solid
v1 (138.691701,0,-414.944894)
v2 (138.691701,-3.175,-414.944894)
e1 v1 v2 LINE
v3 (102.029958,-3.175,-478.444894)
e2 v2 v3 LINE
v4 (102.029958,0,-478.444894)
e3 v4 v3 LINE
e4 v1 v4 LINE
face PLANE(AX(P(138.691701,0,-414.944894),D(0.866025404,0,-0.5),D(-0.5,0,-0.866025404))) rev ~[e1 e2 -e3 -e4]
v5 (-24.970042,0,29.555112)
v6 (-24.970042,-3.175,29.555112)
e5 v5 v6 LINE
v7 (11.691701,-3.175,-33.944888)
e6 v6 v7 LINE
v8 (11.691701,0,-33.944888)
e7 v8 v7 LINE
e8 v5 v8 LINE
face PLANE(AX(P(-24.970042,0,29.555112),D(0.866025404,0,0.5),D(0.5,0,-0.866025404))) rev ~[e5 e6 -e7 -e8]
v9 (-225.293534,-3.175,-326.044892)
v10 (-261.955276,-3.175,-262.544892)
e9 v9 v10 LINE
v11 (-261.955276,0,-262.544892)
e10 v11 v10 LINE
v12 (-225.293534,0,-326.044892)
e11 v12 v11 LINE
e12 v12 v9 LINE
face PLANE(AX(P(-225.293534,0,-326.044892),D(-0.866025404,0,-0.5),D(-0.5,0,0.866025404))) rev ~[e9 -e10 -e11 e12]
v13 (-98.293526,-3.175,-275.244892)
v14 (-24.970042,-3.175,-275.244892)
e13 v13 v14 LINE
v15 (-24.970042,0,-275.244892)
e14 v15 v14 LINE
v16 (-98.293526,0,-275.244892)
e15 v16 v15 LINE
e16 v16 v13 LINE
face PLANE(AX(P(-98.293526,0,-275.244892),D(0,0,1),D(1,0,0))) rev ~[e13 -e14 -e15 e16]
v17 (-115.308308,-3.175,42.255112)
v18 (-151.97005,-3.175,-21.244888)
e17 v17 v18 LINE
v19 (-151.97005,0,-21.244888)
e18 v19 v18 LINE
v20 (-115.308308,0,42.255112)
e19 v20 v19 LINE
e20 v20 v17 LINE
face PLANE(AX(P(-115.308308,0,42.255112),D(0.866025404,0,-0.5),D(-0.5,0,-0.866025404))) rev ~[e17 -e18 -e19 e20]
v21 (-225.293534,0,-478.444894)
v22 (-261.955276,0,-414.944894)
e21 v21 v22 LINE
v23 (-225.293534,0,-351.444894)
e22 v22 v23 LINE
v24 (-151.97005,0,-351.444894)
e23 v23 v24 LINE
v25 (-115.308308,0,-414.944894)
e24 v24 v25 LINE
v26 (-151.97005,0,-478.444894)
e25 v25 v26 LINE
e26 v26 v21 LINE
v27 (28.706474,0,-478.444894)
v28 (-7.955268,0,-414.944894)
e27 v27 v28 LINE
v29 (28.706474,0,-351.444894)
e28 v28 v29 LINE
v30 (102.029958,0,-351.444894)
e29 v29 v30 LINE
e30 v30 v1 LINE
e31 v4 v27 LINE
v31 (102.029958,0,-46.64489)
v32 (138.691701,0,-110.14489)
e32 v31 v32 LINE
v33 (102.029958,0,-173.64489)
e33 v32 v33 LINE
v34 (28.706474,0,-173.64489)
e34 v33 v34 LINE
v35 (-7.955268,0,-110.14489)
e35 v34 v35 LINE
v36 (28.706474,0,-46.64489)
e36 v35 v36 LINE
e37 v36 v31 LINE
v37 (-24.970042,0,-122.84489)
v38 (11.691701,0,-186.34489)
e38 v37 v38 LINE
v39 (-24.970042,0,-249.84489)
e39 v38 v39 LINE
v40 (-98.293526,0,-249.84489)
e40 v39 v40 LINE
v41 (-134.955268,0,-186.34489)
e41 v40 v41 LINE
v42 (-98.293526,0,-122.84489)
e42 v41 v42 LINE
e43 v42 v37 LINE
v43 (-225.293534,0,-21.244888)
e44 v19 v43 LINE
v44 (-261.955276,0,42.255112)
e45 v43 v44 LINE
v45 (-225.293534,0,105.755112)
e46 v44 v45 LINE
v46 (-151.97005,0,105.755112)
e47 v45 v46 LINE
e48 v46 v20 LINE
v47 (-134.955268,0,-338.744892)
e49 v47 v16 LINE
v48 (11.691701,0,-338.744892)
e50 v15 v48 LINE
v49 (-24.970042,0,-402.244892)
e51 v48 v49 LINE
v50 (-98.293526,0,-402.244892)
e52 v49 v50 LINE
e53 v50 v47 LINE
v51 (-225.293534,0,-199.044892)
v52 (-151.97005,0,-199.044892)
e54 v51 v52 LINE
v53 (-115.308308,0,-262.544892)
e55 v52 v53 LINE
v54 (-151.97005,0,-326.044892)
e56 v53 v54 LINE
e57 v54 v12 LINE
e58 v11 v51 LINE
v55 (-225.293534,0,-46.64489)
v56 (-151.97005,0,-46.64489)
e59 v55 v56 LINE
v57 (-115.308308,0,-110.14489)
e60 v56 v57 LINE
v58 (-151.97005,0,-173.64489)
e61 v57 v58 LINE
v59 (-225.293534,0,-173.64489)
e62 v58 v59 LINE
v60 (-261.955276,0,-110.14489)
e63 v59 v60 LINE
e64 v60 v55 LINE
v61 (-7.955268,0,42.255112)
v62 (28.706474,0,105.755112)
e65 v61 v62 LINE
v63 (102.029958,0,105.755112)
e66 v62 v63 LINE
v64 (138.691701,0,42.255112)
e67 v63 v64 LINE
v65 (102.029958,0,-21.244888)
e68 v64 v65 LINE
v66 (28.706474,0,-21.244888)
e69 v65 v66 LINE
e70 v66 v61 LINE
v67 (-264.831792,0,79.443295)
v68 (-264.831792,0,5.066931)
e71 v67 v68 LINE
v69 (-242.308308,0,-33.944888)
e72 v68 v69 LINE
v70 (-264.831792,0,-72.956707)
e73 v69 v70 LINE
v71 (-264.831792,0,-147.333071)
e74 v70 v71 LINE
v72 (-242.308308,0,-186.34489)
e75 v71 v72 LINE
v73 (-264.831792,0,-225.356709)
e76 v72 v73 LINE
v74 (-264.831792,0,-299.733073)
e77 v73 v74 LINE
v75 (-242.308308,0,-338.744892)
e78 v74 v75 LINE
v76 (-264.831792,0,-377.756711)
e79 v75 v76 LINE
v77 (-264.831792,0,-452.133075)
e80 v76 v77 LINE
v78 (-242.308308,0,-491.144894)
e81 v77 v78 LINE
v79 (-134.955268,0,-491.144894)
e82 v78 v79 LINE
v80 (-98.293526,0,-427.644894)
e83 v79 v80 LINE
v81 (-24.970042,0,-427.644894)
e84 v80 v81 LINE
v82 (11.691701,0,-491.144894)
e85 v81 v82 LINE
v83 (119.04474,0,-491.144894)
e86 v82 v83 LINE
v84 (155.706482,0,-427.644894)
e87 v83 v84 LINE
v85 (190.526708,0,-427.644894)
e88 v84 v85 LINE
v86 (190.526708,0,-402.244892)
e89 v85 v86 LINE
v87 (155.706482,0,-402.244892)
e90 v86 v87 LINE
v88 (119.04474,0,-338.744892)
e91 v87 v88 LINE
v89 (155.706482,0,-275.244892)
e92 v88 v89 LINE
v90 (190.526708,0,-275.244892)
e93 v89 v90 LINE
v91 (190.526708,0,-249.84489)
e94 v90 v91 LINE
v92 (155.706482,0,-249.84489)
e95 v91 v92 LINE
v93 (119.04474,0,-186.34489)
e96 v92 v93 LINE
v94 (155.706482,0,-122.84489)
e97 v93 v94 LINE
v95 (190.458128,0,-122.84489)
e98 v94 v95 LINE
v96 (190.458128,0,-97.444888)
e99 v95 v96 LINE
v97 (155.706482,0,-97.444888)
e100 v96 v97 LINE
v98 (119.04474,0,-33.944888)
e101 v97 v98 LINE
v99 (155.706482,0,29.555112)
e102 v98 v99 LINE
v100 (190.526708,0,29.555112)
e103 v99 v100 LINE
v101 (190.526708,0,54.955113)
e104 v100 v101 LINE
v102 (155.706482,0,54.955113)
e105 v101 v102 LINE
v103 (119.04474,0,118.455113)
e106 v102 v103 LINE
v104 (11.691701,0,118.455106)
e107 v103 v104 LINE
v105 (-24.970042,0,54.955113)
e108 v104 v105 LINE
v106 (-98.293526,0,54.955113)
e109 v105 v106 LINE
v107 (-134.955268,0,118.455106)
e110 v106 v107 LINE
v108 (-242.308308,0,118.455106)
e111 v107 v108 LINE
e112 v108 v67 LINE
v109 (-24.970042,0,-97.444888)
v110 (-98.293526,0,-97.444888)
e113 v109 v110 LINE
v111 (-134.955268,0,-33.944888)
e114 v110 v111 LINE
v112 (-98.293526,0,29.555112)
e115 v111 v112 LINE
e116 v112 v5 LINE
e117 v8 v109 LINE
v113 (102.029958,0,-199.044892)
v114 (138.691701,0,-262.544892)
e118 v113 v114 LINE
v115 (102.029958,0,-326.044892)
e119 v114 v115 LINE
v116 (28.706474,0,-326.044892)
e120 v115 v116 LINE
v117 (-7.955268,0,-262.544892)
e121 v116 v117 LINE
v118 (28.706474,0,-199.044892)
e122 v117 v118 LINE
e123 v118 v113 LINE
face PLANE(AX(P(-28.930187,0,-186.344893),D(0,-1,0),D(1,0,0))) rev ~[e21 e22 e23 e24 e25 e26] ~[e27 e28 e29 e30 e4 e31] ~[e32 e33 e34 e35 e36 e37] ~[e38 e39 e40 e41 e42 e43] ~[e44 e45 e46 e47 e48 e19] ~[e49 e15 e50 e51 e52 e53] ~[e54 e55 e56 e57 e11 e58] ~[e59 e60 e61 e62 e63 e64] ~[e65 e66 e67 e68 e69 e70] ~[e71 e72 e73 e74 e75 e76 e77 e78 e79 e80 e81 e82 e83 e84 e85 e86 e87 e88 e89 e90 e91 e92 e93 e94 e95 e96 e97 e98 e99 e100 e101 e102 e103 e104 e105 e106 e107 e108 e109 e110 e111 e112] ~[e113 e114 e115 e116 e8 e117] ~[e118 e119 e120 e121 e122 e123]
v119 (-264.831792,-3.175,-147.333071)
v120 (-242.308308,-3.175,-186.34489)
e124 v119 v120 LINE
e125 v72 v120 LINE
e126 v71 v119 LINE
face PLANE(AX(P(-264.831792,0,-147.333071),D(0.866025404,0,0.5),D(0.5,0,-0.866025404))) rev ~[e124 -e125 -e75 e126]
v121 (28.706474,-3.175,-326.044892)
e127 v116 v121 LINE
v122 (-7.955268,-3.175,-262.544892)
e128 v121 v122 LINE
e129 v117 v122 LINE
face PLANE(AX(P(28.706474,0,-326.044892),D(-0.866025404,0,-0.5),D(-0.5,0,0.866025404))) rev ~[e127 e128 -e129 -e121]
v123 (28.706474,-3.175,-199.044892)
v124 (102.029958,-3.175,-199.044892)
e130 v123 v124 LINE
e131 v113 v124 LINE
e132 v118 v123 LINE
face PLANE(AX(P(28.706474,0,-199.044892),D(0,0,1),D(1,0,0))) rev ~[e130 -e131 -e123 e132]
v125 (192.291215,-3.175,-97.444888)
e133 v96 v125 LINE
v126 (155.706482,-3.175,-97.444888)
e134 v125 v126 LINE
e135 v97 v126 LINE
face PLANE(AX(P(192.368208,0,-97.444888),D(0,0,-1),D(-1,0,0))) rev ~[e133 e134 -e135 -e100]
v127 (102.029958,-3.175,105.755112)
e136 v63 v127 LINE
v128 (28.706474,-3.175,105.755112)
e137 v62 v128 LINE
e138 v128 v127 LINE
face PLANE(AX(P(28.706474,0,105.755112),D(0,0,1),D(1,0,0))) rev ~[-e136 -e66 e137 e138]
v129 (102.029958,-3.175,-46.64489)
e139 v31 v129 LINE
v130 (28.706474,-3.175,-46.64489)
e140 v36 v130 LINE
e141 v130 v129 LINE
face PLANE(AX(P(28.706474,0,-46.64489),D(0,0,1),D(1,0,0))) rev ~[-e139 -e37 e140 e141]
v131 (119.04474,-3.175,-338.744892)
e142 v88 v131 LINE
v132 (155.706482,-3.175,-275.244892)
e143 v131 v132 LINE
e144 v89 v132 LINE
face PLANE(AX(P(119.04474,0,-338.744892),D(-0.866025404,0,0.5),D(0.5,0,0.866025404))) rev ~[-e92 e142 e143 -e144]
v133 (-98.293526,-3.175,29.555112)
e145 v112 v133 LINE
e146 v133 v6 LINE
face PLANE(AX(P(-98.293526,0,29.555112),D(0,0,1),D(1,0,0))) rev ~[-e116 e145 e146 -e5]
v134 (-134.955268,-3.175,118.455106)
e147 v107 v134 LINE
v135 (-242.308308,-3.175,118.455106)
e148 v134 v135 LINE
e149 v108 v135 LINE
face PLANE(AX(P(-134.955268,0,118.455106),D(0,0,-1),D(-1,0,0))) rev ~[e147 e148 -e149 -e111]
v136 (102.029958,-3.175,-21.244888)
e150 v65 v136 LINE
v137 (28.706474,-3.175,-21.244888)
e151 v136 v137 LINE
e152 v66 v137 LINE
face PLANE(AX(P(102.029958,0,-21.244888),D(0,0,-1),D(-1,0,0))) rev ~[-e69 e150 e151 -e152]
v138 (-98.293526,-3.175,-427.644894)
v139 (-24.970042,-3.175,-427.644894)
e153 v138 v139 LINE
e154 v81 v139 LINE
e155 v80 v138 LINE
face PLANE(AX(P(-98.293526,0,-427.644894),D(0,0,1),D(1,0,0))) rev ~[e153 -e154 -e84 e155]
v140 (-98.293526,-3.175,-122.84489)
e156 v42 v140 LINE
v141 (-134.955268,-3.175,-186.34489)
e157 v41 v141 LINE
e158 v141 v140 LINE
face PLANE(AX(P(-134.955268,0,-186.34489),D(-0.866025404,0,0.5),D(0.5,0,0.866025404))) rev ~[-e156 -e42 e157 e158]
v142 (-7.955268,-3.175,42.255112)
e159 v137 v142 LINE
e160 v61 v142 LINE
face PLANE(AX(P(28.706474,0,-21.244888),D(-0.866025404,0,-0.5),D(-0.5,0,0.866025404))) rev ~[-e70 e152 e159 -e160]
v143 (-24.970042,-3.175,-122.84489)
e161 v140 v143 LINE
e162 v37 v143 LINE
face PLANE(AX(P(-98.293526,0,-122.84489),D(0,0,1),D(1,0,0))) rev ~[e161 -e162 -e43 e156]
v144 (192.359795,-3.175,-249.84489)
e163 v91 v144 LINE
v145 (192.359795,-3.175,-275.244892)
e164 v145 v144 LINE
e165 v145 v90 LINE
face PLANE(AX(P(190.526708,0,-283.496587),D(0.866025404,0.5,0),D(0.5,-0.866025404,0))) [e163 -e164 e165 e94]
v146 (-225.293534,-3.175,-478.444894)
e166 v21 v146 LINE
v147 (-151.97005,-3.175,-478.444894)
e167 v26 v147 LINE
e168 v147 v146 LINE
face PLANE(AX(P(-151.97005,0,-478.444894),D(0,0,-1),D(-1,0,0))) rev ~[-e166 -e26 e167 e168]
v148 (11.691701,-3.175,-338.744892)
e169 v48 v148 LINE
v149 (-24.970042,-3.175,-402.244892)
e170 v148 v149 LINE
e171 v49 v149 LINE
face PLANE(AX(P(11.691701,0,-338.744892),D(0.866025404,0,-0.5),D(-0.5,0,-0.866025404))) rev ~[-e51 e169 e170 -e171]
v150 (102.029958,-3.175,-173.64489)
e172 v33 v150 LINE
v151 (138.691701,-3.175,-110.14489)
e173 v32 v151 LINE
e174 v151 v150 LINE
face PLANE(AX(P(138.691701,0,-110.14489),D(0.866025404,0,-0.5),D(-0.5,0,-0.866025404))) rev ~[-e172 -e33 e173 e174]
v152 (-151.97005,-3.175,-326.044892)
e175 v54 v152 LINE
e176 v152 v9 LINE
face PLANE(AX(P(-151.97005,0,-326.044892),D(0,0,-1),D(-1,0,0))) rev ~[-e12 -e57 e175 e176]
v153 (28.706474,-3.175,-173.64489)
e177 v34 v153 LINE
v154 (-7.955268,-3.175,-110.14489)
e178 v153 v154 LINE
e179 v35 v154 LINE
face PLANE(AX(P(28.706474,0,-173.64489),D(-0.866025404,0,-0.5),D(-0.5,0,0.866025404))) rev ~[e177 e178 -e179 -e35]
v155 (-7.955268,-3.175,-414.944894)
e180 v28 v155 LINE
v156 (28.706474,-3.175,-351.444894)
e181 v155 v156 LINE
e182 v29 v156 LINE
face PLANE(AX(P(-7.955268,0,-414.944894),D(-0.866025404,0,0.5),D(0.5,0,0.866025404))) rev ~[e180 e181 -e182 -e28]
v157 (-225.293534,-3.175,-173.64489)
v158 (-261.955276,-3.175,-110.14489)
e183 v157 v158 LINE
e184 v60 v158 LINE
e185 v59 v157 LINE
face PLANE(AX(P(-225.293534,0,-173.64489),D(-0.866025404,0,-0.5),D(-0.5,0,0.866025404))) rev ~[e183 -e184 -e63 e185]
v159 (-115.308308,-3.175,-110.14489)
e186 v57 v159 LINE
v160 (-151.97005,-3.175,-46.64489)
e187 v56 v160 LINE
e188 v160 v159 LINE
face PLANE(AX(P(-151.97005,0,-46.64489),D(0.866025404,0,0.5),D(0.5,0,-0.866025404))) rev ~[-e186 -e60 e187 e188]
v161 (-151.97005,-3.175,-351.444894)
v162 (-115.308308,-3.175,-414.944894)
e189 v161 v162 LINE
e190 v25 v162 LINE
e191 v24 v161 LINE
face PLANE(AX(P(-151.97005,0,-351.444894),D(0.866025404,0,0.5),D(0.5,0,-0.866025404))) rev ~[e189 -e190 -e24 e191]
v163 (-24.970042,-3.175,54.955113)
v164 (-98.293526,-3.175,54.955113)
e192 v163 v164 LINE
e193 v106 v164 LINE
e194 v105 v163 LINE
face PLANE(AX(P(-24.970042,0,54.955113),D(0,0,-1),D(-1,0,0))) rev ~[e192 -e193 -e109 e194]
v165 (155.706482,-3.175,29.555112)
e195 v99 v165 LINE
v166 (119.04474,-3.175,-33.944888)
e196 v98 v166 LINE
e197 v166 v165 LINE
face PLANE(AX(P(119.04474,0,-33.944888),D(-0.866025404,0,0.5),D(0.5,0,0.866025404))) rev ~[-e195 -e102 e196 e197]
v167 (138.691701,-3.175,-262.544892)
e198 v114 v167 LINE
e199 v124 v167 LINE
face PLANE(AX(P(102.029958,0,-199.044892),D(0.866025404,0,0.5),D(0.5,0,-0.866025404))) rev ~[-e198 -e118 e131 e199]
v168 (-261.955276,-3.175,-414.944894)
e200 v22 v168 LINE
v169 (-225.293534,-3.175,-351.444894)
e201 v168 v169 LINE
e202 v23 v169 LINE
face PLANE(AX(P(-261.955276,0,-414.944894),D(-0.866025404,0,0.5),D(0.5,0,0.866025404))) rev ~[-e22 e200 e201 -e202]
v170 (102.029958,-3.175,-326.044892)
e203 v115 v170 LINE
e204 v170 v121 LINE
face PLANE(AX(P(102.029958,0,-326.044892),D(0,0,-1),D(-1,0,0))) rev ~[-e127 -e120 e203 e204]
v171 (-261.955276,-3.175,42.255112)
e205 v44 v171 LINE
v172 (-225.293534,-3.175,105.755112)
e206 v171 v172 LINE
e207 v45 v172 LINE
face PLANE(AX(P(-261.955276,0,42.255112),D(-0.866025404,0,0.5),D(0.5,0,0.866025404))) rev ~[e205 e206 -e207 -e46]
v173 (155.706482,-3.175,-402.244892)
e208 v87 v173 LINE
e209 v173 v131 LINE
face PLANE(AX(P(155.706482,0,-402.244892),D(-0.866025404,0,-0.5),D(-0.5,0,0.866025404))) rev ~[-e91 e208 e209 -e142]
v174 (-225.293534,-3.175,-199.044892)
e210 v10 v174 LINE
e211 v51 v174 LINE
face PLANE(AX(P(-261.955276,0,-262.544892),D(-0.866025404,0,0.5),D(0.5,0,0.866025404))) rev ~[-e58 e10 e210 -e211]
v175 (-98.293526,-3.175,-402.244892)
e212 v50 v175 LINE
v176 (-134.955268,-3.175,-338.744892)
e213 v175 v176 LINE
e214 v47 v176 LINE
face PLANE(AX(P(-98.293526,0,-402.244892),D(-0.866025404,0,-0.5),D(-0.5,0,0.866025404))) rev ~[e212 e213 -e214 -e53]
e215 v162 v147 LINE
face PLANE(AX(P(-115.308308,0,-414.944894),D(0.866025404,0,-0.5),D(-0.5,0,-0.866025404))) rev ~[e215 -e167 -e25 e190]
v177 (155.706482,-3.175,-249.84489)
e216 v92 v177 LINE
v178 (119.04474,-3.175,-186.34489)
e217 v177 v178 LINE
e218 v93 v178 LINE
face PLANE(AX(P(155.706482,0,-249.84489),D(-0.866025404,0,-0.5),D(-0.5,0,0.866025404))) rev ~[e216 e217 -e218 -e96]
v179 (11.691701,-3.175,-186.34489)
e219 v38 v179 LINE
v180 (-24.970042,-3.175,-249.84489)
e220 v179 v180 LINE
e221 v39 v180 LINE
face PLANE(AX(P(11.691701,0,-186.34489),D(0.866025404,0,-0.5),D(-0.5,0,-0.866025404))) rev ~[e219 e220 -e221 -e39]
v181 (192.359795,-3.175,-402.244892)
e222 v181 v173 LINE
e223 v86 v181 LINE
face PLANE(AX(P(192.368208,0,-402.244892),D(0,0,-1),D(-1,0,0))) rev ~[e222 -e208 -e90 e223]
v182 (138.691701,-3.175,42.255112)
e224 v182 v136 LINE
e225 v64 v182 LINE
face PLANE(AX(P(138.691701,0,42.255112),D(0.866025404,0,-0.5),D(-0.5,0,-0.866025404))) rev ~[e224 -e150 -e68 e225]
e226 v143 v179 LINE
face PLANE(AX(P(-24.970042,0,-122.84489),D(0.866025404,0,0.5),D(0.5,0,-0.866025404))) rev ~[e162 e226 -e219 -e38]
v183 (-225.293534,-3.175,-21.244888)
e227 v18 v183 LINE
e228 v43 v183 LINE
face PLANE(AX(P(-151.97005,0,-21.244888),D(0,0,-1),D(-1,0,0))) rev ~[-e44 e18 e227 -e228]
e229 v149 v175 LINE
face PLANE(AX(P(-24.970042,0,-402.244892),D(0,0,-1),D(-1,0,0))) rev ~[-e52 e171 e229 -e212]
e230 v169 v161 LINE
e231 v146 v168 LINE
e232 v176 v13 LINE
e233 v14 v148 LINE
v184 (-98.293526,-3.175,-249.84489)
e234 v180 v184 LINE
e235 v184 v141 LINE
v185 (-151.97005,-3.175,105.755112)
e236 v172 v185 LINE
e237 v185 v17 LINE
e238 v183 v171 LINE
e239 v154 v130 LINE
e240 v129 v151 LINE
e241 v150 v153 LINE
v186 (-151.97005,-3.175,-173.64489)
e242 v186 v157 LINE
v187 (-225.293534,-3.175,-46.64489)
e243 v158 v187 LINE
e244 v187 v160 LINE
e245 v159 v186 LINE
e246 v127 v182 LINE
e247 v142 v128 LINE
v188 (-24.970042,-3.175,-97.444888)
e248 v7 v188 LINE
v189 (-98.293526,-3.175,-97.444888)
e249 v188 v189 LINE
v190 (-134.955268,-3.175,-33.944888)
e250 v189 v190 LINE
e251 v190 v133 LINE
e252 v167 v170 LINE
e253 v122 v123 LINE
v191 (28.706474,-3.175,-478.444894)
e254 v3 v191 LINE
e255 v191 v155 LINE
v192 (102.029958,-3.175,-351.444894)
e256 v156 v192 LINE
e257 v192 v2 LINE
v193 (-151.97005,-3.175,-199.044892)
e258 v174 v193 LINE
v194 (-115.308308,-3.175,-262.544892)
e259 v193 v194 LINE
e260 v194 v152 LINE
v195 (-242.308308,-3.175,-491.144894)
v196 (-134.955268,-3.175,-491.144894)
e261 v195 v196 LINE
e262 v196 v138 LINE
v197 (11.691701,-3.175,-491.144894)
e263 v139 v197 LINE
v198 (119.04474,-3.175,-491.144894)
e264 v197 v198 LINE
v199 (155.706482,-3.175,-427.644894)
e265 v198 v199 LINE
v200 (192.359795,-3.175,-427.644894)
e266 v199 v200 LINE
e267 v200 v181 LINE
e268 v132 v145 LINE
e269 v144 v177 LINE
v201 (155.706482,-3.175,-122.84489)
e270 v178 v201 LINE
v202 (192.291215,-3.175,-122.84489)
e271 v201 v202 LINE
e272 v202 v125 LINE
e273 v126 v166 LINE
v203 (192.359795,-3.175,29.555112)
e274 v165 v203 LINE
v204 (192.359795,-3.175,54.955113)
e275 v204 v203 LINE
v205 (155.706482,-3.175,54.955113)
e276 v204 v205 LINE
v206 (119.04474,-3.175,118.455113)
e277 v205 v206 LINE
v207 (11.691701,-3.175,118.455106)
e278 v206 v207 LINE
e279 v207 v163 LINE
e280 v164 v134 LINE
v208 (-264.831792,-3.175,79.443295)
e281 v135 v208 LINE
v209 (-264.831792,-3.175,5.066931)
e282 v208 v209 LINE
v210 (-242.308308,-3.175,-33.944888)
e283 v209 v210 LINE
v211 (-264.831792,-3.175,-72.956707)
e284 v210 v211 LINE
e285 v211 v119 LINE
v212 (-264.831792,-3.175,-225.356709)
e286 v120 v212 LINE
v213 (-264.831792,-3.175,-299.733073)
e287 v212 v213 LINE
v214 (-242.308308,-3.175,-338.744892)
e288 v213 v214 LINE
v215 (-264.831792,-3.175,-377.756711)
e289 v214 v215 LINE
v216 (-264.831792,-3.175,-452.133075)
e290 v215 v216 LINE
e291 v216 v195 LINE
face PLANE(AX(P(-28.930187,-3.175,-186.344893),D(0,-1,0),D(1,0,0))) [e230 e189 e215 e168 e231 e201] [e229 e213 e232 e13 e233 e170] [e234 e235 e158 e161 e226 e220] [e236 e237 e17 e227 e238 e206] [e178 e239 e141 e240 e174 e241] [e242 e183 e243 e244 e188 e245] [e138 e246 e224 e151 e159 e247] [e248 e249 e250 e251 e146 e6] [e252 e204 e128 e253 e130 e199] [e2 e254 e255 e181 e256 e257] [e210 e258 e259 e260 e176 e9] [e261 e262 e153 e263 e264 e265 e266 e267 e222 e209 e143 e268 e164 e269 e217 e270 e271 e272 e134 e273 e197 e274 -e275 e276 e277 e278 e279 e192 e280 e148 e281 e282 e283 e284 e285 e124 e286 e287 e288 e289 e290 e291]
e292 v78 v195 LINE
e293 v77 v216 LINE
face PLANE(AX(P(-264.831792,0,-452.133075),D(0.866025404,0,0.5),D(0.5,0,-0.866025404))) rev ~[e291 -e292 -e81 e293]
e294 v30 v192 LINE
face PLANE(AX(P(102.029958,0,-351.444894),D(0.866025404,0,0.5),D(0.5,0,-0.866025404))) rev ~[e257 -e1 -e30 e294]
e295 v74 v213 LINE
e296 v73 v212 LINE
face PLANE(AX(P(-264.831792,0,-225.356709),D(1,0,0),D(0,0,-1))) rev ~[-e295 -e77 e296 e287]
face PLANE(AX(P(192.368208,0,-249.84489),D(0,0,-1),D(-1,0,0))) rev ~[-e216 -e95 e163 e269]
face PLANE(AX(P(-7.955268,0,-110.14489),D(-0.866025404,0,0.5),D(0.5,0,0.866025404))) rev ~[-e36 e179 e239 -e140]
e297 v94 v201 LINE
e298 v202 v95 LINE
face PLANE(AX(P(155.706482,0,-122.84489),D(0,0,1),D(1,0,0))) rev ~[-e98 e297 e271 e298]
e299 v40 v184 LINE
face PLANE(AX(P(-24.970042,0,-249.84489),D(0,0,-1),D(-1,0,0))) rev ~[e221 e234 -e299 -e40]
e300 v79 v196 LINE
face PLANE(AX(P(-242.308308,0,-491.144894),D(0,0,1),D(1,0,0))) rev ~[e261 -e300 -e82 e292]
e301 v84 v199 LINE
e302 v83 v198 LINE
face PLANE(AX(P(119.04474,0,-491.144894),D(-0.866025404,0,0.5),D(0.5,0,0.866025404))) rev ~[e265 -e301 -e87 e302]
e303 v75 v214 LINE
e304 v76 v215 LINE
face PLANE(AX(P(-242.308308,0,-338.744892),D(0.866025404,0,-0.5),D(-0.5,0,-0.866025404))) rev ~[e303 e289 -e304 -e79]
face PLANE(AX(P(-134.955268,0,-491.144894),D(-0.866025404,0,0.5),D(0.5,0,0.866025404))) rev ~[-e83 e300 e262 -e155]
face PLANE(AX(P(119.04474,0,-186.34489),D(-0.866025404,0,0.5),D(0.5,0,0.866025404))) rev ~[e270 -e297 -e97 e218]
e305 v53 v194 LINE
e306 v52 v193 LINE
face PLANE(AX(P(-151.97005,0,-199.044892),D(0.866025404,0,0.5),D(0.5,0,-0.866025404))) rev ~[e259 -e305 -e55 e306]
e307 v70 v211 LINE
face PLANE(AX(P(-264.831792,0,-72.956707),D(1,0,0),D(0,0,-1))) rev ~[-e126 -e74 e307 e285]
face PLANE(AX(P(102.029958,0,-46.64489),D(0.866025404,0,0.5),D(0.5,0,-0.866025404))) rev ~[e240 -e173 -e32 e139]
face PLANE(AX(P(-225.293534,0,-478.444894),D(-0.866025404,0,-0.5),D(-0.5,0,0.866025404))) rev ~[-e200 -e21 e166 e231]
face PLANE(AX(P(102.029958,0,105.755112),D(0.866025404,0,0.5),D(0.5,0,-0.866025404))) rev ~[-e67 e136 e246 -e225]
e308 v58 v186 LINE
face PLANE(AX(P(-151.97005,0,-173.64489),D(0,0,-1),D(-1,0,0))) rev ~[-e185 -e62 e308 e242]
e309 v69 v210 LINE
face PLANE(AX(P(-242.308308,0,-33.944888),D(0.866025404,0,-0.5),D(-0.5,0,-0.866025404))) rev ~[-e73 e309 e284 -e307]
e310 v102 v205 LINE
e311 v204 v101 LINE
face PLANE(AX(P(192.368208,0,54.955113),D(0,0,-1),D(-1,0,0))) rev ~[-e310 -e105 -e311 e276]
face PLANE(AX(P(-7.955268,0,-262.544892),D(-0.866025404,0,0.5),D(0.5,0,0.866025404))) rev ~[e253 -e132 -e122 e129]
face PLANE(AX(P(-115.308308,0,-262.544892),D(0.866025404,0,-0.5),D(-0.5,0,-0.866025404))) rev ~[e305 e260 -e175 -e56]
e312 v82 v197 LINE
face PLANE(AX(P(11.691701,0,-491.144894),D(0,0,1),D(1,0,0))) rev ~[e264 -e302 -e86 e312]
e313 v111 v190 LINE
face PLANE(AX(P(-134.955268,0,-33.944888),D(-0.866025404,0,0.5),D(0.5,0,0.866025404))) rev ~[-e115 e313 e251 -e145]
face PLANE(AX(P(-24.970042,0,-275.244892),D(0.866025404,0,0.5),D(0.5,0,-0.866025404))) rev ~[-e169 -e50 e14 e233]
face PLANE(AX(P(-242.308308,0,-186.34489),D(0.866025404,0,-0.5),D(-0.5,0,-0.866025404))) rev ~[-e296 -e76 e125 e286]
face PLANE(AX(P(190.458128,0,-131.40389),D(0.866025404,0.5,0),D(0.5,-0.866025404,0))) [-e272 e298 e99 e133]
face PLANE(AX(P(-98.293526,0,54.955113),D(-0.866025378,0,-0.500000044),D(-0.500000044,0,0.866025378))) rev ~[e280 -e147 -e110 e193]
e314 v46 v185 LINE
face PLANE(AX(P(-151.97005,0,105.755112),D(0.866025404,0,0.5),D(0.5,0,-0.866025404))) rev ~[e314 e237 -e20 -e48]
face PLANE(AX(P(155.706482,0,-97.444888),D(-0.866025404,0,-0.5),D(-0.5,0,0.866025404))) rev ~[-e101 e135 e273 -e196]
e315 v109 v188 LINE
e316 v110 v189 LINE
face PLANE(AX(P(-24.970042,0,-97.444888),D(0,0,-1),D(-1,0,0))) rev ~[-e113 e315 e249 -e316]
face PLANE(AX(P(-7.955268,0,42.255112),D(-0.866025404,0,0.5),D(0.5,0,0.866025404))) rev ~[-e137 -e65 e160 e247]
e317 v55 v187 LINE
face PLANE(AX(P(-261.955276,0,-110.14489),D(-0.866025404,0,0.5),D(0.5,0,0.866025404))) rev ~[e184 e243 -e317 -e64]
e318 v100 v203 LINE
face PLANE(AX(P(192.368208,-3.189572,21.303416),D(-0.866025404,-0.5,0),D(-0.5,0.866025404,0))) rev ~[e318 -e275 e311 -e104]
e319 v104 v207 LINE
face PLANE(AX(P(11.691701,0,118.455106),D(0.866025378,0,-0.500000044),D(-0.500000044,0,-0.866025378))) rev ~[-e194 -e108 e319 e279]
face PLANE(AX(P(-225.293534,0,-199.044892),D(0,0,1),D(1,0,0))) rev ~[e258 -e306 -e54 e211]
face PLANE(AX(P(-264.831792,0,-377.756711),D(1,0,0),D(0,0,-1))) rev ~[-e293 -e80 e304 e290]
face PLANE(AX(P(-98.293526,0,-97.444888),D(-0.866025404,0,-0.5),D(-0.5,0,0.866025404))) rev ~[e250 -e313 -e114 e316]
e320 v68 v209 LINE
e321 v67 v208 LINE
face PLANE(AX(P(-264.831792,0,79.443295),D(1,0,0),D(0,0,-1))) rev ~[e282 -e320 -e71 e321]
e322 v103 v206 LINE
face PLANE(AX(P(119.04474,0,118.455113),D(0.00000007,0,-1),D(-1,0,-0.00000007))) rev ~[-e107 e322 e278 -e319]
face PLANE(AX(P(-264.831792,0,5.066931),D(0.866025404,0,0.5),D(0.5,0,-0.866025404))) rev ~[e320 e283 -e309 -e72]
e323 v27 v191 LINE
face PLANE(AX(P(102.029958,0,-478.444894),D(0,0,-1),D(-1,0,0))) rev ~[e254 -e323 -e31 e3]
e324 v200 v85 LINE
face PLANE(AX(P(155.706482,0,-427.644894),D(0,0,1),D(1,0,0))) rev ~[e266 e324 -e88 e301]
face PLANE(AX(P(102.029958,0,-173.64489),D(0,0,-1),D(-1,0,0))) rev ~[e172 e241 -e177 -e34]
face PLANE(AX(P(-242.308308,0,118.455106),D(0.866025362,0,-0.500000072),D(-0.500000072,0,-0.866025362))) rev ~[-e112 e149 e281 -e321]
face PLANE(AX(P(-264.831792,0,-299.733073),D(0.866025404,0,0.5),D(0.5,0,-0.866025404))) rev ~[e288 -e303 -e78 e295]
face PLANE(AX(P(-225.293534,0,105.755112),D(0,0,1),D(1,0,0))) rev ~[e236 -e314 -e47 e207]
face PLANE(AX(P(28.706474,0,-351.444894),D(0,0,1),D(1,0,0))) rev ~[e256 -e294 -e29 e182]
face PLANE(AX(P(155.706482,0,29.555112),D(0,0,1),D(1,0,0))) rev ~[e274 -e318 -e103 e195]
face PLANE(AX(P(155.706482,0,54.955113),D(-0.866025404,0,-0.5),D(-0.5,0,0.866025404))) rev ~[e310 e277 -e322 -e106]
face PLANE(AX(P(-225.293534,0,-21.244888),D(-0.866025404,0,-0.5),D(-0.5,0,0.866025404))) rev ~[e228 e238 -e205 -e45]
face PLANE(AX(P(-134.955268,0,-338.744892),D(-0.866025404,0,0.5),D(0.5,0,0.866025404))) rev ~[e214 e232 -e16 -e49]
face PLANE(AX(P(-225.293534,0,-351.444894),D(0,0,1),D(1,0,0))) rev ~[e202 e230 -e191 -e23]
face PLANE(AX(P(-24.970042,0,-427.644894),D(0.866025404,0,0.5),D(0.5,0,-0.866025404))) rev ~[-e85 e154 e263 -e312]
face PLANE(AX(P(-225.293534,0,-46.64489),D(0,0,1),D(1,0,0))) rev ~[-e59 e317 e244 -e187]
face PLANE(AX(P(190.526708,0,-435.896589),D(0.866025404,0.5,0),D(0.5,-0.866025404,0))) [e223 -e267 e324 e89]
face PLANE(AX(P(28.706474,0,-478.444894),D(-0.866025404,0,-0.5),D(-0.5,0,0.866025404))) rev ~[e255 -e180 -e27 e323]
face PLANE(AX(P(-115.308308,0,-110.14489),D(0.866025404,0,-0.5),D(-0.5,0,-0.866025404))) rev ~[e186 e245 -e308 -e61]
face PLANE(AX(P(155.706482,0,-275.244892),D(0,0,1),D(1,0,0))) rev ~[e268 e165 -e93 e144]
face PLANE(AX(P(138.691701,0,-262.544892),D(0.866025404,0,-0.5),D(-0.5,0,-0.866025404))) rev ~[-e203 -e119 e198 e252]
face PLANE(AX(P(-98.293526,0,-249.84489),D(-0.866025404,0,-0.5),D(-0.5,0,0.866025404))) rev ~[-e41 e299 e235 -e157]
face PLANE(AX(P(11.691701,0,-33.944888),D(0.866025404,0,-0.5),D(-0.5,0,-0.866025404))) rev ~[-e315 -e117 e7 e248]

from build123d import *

# Parameters (mm, degrees)
F1_DEPTH    = 3.175
F2_T1_DEPTH = 41.9033921872
F3_T1_DEPTH = 42.5180012054
F4_T1_DEPTH = 41.9033921872
F5_T1_DEPTH = 41.9033921872


# Not quite as in the source:
# - a fillet or chamfer that OpenCascade refuses, or shapes differently, is made with other operations: its cross-section is extruded or revolved along the edge and cut away or added
# - ends of sketch curves that miss each other by under 0.0002 mm in the source are joined


with BuildPart() as f1:
    # F0 (on Front) → F1 (new body)
    with BuildSketch(Plane.XZ):
        Polygon((-134.9552678654, 118.4551059571), (-242.3083075974, 118.4551059571), (-264.8317917845, 79.4432945156), (-264.8317917845, 5.0669305831), (-242.3083075974, -33.9448883924), (-264.8317917845, -72.9567073679), (-264.8317917845, -147.3330713004), (-242.3083075974, -186.3448902759), (-264.8317917845, -225.3567092514), (-264.8317917845, -299.7330731839), (-242.3083075974, -338.7448921594), (-264.8317917845, -377.7567111349), (-264.8317917845, -452.1330750674), (-242.3083075974, -491.1448940429), (-134.9552678654, -491.1448940429), (-98.2935257718, -427.6448940429), (-24.9700415847, -427.6448940429), (11.6917005088, -491.1448940429), (119.0447402409, -491.1448940429), (155.7064823344, -427.6448940429), (192.3682082155, -427.6448940429), (192.3682082155, -402.2448921594), (155.7064823344, -402.2448921594), (119.0447402409, -338.7448921594), (155.7064823344, -275.2448921594), (192.3682082155, -275.2448921594), (192.3682082155, -249.8448902759), (155.7064823344, -249.8448902759), (119.0447402409, -186.3448902759), (155.7064823344, -122.8448902759), (192.3682082155, -122.8448902759), (192.3682082155, -97.4448883924), (155.7064823344, -97.4448883924), (119.0447402409, -33.9448883924), (155.7064823344, 29.5551116076), (192.3682082155, 29.5551116076), (192.3682082155, 54.9551134911), (155.7064823344, 54.9551134911), (119.0447402409, 118.4551134911), (11.6917005088, 118.4551059571), (-24.9700415847, 54.9551134911), (-98.2935257718, 54.9551134911), align=None)
        Polygon((-261.9552759716, -414.9448940429), (-225.2935338781, -351.4448940429), (-151.970049691, -351.4448940429), (-115.3083075974, -414.9448940429), (-151.970049691, -478.4448940429), (-225.2935338781, -478.4448940429), align=None, mode=Mode.SUBTRACT)
        Polygon((11.6917005088, -338.7448921594), (-24.9700415847, -402.2448921594), (-98.2935257718, -402.2448921594), (-134.9552678654, -338.7448921594), (-98.2935257718, -275.2448921594), (-24.9700415847, -275.2448921594), align=None, mode=Mode.SUBTRACT)
        Polygon((-115.3083075974, -262.5448921594), (-151.970049691, -326.0448921594), (-225.2935338781, -326.0448921594), (-261.9552759716, -262.5448921594), (-225.2935338781, -199.0448921594), (-151.970049691, -199.0448921594), align=None, mode=Mode.SUBTRACT)
        Polygon((138.6917005088, -414.9448940429), (102.0299584153, -478.4448940429), (28.7064742282, -478.4448940429), (-7.9552678654, -414.9448940429), (28.7064742282, -351.4448940429), (102.0299584153, -351.4448940429), align=None, mode=Mode.SUBTRACT)
        Polygon((138.6917005088, -262.5448921594), (102.0299584153, -326.0448921594), (28.7064742282, -326.0448921594), (-7.9552678654, -262.5448921594), (28.7064742282, -199.0448921594), (102.0299584153, -199.0448921594), align=None, mode=Mode.SUBTRACT)
        Polygon((-115.3083075974, -110.1448902759), (-151.970049691, -173.6448902759), (-225.2935338781, -173.6448902759), (-261.9552759716, -110.1448902759), (-225.2935338781, -46.6448902759), (-151.970049691, -46.6448902759), align=None, mode=Mode.SUBTRACT)
        Polygon((11.6917005088, -186.3448902759), (-24.9700415847, -249.8448902759), (-98.2935257718, -249.8448902759), (-134.9552678654, -186.3448902759), (-98.2935257718, -122.8448902759), (-24.9700415847, -122.8448902759), align=None, mode=Mode.SUBTRACT)
        Polygon((11.6917005088, -33.9448883924), (-24.9700415847, -97.4448883924), (-98.2935257718, -97.4448883924), (-134.9552678654, -33.9448883924), (-98.2935257718, 29.5551116076), (-24.9700415847, 29.5551116076), align=None, mode=Mode.SUBTRACT)
        Polygon((-115.3083075974, 42.2551116076), (-151.970049691, -21.2448883924), (-225.2935338781, -21.2448883924), (-261.9552759716, 42.2551116076), (-225.2935338781, 105.7551116076), (-151.970049691, 105.7551116076), align=None, mode=Mode.SUBTRACT)
        Polygon((138.6917005088, -110.1448902759), (102.0299584153, -173.6448902759), (28.7064742282, -173.6448902759), (-7.9552678654, -110.1448902759), (28.7064742282, -46.6448902759), (102.0299584153, -46.6448902759), align=None, mode=Mode.SUBTRACT)
        Polygon((138.6917005088, 42.2551116076), (102.0299584153, -21.2448883924), (28.7064742282, -21.2448883924), (-7.9552678654, 42.2551116076), (28.7064742282, 105.7551116076), (102.0299584153, 105.7551116076), align=None, mode=Mode.SUBTRACT)
    extrude(amount=F1_DEPTH)

    # F2: chamfer of 1.8415 x 3.1895715621 on 1 edges, made by hand

    # F2_s2 → F2_t1 (cut)
    with BuildSketch(Plane.XY.offset(21.3034164558)):
        Polygon((192.3682082155, -3.1895715621), (190.5267082155, 0), (192.3682082155, 0), align=None)
    extrude(amount=F2_T1_DEPTH, mode=Mode.SUBTRACT)

    # F3: chamfer of 1.91008 x 3.3083556065 on 1 edges, made by hand

    # F3_s2 → F3_t1 (cut)
    with BuildSketch(Plane.XY.offset(-131.4038899368)):
        Polygon((190.4581282155, 0), (192.3682082155, -3.3083556065), (192.3682082155, 0), align=None)
    extrude(amount=F3_T1_DEPTH, mode=Mode.SUBTRACT)

    # F4: chamfer of 1.8415 x 3.1895715621 on 1 edges, made by hand

    # F4_s2 → F4_t1 (cut)
    with BuildSketch(Plane.XY.offset(-283.4965873112)):
        Polygon((190.5267082155, 0), (192.3682082155, -3.1895715621), (192.3682082155, 0), align=None)
    extrude(amount=F4_T1_DEPTH, mode=Mode.SUBTRACT)

    # F5: chamfer of 1.8415 x 3.1895715621 on 1 edges, made by hand

    # F5_s2 → F5_t1 (cut)
    with BuildSketch(Plane.XY.offset(-435.8965891948)):
        Polygon((190.5267082155, 0), (192.3682082155, -3.1895715621), (192.3682082155, 0), align=None)
    extrude(amount=F5_T1_DEPTH, mode=Mode.SUBTRACT)


solid = f1.part
